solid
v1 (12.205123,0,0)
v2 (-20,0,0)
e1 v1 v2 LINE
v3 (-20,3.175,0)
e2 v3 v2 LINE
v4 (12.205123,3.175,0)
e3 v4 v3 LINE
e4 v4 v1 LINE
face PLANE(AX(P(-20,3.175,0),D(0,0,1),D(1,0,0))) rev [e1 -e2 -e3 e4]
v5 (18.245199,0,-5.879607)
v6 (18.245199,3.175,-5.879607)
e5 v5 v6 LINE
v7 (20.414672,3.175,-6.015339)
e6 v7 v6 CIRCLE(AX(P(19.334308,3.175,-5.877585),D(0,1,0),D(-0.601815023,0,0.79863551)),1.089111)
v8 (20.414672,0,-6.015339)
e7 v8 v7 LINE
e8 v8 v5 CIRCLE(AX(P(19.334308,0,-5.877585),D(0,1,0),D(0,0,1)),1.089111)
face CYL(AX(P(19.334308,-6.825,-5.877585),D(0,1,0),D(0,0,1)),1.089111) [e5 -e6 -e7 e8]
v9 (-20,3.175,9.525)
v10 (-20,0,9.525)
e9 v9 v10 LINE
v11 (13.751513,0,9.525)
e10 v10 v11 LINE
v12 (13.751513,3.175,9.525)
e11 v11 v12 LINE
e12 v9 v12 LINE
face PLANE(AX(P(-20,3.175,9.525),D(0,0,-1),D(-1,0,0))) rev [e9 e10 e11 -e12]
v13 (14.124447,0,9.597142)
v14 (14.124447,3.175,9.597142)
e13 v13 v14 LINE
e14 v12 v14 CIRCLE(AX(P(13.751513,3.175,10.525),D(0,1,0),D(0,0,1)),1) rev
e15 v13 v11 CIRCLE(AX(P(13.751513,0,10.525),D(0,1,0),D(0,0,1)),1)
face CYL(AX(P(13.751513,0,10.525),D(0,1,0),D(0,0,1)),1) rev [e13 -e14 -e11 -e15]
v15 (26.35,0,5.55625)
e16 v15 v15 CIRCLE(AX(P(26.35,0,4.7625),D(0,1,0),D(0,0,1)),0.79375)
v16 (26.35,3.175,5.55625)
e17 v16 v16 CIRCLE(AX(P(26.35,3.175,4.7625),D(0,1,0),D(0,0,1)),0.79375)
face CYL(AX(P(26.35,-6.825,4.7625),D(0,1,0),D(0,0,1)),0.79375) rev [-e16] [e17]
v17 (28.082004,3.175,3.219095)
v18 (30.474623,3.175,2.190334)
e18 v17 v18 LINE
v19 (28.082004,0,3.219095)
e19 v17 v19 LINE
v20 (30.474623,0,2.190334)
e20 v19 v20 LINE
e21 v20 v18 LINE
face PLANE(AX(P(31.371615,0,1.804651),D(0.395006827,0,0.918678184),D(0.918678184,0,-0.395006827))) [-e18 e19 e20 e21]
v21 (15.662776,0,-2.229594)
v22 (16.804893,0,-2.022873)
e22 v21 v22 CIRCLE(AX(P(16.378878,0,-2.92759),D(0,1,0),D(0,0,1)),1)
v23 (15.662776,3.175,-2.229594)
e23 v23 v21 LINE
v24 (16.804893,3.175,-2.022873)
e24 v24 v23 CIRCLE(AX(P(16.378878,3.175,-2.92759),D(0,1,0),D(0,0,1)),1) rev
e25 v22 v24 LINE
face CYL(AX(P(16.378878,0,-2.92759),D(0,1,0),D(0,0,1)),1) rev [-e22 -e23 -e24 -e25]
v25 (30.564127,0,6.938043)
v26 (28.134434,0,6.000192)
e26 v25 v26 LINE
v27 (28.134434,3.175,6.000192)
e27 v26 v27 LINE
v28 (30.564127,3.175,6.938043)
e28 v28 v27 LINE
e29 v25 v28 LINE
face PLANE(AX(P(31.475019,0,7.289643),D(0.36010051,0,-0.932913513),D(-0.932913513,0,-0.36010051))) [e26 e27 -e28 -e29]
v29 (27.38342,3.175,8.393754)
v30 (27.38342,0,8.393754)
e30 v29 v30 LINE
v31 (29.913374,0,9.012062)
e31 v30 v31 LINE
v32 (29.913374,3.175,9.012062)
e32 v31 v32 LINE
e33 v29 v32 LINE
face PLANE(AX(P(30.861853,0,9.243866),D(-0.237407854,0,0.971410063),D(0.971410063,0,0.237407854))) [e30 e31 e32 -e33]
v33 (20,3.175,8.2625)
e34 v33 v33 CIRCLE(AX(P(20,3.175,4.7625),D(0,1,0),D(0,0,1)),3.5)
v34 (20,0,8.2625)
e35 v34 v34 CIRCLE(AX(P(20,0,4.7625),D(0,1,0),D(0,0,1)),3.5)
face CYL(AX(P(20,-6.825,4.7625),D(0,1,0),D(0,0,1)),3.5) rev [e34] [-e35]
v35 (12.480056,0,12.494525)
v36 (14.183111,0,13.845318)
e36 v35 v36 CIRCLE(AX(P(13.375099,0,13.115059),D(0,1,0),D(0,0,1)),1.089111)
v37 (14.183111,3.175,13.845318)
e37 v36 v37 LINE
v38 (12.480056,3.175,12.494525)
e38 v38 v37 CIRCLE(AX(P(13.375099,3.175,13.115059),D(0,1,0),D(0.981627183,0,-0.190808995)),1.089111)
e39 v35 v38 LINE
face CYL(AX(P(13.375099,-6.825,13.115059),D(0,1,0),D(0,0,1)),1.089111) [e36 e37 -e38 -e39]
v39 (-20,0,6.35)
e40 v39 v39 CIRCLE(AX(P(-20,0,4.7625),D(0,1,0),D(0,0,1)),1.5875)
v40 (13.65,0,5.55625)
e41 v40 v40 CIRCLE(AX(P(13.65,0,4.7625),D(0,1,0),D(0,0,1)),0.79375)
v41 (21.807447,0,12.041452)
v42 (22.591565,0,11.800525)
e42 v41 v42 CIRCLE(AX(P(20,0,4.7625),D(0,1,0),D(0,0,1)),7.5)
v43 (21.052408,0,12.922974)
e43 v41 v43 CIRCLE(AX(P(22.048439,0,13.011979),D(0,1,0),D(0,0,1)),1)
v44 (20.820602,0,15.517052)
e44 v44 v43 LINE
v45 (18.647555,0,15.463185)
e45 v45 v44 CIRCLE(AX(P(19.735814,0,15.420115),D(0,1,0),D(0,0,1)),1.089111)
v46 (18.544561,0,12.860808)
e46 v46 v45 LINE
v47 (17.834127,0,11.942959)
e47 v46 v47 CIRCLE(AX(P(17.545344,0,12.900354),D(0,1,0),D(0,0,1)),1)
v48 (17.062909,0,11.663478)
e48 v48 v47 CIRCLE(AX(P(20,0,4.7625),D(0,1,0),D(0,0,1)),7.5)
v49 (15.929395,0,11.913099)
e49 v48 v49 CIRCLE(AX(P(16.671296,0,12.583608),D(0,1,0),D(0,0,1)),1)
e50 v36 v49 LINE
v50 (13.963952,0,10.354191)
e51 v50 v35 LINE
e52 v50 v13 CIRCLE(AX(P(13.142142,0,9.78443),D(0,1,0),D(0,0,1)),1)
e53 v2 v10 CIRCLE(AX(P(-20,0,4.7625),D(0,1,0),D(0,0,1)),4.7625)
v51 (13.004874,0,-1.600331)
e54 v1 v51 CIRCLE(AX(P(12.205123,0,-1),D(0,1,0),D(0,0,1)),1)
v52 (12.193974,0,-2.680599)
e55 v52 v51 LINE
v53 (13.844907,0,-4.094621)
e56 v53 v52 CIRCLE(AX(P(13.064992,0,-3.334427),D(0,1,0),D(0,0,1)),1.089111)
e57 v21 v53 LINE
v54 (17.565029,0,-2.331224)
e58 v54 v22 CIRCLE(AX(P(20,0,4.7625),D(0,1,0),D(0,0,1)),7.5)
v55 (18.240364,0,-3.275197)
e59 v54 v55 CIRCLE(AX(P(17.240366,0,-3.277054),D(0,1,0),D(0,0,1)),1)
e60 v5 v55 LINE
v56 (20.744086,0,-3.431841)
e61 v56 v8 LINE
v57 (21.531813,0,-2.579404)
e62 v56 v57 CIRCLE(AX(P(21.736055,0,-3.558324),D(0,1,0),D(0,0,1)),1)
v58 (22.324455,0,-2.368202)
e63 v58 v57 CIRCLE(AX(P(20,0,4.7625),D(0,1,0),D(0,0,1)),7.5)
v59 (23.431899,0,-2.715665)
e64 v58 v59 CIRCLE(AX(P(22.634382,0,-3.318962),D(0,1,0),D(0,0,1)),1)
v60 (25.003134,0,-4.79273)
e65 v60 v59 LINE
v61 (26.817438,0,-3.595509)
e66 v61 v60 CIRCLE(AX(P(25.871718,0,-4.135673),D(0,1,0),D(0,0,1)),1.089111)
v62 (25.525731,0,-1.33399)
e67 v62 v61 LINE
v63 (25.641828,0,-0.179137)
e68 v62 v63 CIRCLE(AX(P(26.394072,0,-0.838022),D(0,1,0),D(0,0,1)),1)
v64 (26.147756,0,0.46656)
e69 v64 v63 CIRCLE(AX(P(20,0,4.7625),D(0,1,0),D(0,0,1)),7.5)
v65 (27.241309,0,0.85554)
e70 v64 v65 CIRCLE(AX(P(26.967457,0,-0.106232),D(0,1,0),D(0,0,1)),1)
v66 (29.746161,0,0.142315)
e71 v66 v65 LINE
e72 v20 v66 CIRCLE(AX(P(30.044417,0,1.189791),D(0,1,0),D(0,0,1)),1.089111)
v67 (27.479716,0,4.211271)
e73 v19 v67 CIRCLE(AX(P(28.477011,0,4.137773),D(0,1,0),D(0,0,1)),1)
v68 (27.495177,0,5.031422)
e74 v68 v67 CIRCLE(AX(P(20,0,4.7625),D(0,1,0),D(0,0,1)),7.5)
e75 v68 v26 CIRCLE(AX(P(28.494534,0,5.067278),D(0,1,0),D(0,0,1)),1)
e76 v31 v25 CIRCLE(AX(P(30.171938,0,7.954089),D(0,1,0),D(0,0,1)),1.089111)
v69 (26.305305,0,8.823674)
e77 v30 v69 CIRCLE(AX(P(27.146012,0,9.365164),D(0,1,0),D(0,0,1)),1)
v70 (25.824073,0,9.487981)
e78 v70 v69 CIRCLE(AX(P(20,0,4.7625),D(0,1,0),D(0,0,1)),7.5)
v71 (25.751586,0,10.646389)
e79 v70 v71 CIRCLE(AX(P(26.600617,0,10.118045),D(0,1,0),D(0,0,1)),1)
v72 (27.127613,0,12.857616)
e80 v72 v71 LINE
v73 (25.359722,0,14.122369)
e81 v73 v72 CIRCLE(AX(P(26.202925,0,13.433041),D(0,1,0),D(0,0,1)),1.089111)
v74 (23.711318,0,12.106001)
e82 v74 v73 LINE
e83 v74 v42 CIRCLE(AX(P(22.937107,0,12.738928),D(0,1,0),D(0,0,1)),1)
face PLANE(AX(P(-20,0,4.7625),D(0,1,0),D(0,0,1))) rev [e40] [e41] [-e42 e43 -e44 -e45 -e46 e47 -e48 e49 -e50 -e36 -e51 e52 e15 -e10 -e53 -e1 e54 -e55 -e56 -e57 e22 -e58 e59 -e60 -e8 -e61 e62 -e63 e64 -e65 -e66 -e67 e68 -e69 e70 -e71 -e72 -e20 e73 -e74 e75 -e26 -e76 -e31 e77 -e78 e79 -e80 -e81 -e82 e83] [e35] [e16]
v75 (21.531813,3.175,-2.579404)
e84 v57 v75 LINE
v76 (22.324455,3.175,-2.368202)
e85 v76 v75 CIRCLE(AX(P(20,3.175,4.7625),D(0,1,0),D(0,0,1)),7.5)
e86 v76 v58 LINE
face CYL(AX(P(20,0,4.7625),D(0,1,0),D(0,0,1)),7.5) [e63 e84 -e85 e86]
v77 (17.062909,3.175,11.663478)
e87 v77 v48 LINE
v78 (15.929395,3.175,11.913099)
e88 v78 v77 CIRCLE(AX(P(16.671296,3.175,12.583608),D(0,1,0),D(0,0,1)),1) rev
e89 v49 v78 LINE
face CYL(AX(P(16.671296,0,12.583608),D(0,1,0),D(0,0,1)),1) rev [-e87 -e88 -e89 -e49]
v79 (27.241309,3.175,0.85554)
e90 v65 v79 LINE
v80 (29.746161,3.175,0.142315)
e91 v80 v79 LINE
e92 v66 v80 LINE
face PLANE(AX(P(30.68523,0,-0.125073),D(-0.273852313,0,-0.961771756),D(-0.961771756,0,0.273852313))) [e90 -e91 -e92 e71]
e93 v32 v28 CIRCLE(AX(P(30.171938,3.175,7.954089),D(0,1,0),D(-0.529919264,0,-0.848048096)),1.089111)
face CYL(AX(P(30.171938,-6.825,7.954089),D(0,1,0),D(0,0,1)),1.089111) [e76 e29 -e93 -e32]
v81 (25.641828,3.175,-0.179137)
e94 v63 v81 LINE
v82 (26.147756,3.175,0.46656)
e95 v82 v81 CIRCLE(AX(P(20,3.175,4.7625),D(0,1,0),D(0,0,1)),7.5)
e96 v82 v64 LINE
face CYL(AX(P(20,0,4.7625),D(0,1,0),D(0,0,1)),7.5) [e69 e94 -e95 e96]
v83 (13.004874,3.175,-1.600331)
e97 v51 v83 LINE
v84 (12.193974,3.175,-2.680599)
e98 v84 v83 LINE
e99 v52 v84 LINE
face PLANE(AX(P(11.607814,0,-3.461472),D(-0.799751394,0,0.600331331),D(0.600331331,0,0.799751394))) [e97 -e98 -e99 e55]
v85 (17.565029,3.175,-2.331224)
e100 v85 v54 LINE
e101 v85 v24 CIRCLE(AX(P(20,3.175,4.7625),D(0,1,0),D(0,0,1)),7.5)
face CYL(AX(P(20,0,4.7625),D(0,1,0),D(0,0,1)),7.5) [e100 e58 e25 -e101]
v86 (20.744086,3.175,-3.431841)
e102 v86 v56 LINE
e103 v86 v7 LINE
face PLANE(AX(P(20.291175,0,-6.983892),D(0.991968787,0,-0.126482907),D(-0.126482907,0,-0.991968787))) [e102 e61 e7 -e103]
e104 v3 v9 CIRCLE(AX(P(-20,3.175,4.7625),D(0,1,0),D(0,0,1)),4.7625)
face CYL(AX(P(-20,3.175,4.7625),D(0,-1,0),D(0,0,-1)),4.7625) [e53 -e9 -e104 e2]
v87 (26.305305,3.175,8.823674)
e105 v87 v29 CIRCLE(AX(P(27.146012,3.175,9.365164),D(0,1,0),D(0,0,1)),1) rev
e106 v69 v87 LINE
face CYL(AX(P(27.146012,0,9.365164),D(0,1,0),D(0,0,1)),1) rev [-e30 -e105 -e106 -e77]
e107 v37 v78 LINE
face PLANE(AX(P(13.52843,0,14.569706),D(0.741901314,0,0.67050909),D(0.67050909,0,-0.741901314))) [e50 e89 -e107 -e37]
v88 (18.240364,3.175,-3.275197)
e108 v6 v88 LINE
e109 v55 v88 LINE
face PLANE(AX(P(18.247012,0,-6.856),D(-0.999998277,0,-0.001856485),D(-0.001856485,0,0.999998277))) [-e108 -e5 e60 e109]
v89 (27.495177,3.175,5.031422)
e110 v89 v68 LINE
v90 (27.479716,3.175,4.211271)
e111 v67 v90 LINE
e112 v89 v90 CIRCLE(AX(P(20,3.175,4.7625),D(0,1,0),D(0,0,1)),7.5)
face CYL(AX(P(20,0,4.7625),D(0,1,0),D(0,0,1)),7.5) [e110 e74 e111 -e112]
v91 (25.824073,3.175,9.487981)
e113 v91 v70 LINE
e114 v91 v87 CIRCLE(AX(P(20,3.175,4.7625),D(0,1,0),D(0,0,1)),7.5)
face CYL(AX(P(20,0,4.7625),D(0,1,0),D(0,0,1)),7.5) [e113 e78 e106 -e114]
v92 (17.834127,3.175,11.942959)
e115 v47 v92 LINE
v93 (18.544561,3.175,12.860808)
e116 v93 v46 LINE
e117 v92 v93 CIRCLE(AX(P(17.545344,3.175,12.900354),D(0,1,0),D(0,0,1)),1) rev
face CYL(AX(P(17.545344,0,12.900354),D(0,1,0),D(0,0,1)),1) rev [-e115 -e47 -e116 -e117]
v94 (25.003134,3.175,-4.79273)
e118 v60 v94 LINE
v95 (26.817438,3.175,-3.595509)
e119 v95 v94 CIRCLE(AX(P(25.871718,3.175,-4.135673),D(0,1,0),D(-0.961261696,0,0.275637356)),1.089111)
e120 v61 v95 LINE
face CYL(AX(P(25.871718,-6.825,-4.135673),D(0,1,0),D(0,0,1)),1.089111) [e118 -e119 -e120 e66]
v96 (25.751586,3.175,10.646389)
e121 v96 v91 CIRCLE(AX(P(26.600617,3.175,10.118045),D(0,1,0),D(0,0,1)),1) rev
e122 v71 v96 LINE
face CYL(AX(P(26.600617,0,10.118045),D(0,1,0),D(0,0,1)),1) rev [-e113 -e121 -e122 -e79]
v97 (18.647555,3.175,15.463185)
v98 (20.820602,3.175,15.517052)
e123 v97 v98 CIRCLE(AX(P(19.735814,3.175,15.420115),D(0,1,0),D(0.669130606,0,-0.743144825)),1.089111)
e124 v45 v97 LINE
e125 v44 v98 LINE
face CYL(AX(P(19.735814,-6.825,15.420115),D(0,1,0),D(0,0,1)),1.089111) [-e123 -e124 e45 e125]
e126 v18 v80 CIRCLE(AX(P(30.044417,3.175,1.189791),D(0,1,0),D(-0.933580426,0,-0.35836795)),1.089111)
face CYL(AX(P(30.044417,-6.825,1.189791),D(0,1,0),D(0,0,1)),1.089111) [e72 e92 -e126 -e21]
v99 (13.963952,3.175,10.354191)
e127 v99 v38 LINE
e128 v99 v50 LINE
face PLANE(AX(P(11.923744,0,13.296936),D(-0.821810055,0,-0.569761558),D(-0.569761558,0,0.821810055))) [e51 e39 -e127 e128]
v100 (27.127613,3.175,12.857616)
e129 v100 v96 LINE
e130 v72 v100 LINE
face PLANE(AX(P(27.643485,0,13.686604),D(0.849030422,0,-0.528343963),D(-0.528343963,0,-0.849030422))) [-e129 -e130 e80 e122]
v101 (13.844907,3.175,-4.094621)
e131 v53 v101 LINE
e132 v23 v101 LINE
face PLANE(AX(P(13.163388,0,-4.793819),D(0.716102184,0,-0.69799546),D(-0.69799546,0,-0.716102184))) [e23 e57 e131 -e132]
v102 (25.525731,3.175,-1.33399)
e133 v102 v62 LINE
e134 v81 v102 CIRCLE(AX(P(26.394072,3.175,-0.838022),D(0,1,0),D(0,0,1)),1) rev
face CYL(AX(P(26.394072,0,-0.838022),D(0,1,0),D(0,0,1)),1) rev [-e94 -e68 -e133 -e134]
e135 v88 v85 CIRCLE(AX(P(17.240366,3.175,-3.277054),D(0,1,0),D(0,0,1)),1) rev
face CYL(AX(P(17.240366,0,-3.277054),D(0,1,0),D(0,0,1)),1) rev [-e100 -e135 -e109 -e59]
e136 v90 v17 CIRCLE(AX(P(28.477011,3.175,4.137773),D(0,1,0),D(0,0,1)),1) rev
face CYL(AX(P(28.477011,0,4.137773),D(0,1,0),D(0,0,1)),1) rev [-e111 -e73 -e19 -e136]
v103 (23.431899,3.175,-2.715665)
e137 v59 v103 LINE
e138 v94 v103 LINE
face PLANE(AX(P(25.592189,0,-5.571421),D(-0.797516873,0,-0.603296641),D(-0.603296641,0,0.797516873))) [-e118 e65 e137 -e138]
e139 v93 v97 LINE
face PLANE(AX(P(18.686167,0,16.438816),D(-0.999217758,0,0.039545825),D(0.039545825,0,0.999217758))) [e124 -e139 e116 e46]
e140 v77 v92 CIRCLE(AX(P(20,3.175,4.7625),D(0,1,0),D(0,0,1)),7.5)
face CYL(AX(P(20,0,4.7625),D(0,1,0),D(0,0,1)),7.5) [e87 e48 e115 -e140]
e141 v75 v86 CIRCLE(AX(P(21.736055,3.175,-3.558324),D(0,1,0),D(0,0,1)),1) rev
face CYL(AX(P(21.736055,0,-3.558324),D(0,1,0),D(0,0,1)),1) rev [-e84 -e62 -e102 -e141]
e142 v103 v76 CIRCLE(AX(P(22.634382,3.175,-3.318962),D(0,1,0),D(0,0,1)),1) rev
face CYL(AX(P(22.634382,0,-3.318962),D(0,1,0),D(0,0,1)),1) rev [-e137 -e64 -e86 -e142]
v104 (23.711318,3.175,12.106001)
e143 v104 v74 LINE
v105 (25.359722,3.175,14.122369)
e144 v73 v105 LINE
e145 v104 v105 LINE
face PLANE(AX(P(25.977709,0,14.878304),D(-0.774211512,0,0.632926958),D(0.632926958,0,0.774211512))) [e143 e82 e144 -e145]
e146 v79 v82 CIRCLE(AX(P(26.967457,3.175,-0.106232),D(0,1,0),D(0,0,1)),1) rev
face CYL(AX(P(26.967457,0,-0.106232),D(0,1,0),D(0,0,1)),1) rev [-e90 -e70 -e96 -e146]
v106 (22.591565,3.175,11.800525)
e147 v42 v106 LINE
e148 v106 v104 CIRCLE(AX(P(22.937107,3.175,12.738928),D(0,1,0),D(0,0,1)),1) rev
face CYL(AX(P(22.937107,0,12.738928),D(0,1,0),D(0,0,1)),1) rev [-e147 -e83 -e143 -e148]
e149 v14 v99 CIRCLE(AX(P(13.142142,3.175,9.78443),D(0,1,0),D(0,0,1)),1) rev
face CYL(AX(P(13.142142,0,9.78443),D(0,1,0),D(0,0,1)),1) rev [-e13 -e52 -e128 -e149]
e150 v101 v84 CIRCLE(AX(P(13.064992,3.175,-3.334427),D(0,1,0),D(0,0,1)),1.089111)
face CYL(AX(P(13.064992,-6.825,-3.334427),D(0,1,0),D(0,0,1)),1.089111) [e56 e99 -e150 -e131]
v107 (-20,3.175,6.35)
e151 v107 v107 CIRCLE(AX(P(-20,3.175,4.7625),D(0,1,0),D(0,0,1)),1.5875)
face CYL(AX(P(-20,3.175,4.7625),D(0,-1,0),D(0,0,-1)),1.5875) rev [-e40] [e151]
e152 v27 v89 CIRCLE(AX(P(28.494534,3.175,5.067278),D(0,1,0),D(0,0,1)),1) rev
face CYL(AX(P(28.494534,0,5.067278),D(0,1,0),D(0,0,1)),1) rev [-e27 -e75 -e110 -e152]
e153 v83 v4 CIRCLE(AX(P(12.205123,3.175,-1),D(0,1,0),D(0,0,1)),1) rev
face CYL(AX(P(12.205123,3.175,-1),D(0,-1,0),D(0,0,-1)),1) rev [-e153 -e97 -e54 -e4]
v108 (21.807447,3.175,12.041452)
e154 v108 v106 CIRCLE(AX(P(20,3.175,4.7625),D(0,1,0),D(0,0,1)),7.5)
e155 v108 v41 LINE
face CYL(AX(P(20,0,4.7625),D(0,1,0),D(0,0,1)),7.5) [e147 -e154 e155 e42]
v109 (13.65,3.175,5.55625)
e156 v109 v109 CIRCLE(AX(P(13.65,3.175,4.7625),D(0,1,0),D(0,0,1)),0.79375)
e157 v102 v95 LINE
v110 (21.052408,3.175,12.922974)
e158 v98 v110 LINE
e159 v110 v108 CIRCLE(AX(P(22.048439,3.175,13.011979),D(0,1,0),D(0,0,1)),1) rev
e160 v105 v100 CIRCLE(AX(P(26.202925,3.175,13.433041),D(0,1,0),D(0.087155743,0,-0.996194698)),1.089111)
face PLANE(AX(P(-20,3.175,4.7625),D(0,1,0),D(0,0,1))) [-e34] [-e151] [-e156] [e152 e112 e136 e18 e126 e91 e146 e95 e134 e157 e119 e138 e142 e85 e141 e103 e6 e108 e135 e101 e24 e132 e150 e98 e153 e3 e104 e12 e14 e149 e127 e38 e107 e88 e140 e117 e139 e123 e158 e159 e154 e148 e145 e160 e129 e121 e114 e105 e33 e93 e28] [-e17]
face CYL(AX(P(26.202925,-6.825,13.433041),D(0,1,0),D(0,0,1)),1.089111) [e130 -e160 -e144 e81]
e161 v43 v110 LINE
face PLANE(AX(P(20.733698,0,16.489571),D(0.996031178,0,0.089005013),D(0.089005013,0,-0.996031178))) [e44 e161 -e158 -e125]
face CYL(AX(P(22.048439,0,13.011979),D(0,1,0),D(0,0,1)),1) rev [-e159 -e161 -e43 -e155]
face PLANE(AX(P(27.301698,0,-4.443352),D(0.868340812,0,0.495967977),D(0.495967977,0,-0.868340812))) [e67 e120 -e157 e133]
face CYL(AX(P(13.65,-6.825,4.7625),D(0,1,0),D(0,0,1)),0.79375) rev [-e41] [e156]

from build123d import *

# Parameters (mm, degrees)
CROQUIS1_R              = 1.5875
SALIENTE_EXTRUIR1_DEPTH = 3.175
SALIENTE_EXTRUIR2_START = -3.175
CROQUIS2_R              = 7.5
CROQUIS2_R_2            = 1.5875
SALIENTE_EXTRUIR2_DEPTH = 3.175
CROQUIS7_R              = 3.5
CROQUIS7_R_2            = 0.79375
CORTAR_EXTRUIR3_DEPTH   = 10
SALIENTE_EXTRUIR3_START = -3.175
SALIENTE_EXTRUIR3_DEPTH = 3.175
CORTAR_EXTRUIR4_START   = -10
CORTAR_EXTRUIR4_DEPTH   = 10
MATRIZC1_COUNT          = 8
MATRIZC1_ANGLE          = 259
REDONDEO1_R             = 1


with BuildPart() as part:
    # Croquis1 → Saliente-Extruir1 (new body)
    with BuildSketch(Plane(origin=(0, 0, 0), x_dir=(1, 0, 0), z_dir=(0, 1, 0))):
        with BuildLine():
            Line((-20, 0), (20, 0))
            ThreePointArc((20, 0), (24.7625, -4.7625), (20, -9.525))
            Line((20, -9.525), (-20, -9.525))
            ThreePointArc((-20, -9.525), (-24.7625, -4.7625), (-20, 0))
        make_face()
        with Locations(Location((-20, -4.7625, 0), (0, 0, 270))):
            Circle(CROQUIS1_R, mode=Mode.SUBTRACT)
        with Locations(Location((20, -4.7625, 0), (0, 0, 270))):
            Circle(CROQUIS1_R, mode=Mode.SUBTRACT)
    extrude(amount=SALIENTE_EXTRUIR1_DEPTH)

    # Croquis2 → Saliente-Extruir2 (add)
    with BuildSketch(Plane(origin=(0, 3.175, 0), x_dir=(1, 0, 0), z_dir=(0, 1, 0)).offset(SALIENTE_EXTRUIR2_START)):
        with Locations((20, -4.7625)):
            Circle(CROQUIS2_R)
        with Locations(Location((20, -4.7625, 0), (0, 0, 270))):
            Circle(CROQUIS2_R_2, mode=Mode.SUBTRACT)
    extrude(amount=SALIENTE_EXTRUIR2_DEPTH)

    # Croquis7 → Cortar-Extruir3 (cut)
    with BuildSketch(Plane(origin=(0, 3.175, 0), x_dir=(1, 0, 0), z_dir=(0, 1, 0))):
        with Locations(Location((20, -4.7625, 0), (0, 0, 270))):
            Circle(CROQUIS7_R)
        with Locations(Location((13.65, -4.7625, 0), (0, 0, 270))):
            Circle(CROQUIS7_R_2)
        with Locations(Location((26.35, -4.7625, 0), (0, 0, 270))):
            Circle(CROQUIS7_R_2)
    extrude(amount=-CORTAR_EXTRUIR3_DEPTH, mode=Mode.SUBTRACT)

    # Croquis8 → Saliente-Extruir3 (add)
    with BuildSketch(Plane(origin=(0, 3.175, 0), x_dir=(1, 0, 0), z_dir=(0, 1, 0)).offset(SALIENTE_EXTRUIR3_START)):
        with BuildLine():
            Line((11.607813982, 3.461471902), (14.206158981, 0))
            ThreePointArc((14.206158981, 0), (15.121179891, 0.933736858), (16.184441281, 1.694396442))
            Line((16.184441281, 1.694396442), (13.163387879, 4.793819098))
            ThreePointArc((13.163387879, 4.793819098), (12.356515163, 4.161604411), (11.607813982, 3.461471902))
        make_face()
    saliente_extruir3 = extrude(amount=SALIENTE_EXTRUIR3_DEPTH)

    # Croquis9 → Cortar-Extruir4 (cut)
    with BuildSketch(Plane(origin=(0, 3.175, 0), x_dir=(1, 0, 0), z_dir=(0, 1, 0)).offset(CORTAR_EXTRUIR4_START)):
        with BuildLine():
            ThreePointArc((12.35651523, 4.161604469), (11.974526132, 3.819706546), (11.607813982, 3.461471902))
            Line((11.607813982, 3.461471902), (12.19397403, 2.680599255))
            ThreePointArc((12.19397403, 2.680599255), (11.982381708, 3.453243741), (12.35651523, 4.161604469))
        make_face()
        with BuildLine():
            ThreePointArc((13.163387879, 4.793819098), (12.753054069, 4.486514795), (12.35651523, 4.161604469))
            ThreePointArc((12.35651523, 4.161604469), (13.113956627, 4.422436237), (13.844906618, 4.094621057))
            Line((13.844906618, 4.094621057), (13.163387879, 4.793819098))
        make_face()
    cortar_extruir4 = extrude(amount=CORTAR_EXTRUIR4_DEPTH, mode=Mode.SUBTRACT)

    # MatrizC1: Saliente-Extruir3, Cortar-Extruir4 ×8 about axis
    matrizc1_axis = Axis((20, 0, 4.7625), (0, -1, 0))
    add([saliente_extruir3.rotate(matrizc1_axis, i * MATRIZC1_ANGLE / (MATRIZC1_COUNT - 1)) for i in range(1, MATRIZC1_COUNT)])
    add([cortar_extruir4.rotate(matrizc1_axis, i * MATRIZC1_ANGLE / (MATRIZC1_COUNT - 1)) for i in range(1, MATRIZC1_COUNT)], mode=Mode.SUBTRACT)

    # Redondeo1
    # the kernel refuses this fillet: 1 mm, written as the material it adds along each edge
    with BuildSketch(Plane(origin=(25.155056708, 0, -0.685012307), x_dir=(0.6933697506528057, 0, 0.7205819792915072), z_dir=(0, 1, 0)), Plane(origin=(27.395406089, 0, 3.514313802), x_dir=(0.12009264391370789, 0, 0.9927626891044079), z_dir=(0, 1, 0)), Plane(origin=(26.657411119, 0, 8.216320666), x_dir=(-0.501549250802915, 0, 0.8651290938461349), z_dir=(0, 1, 0)), Plane(origin=(23.238283761, 0, 11.527373856), x_dir=(-0.9212027273713431, 0, 0.389082941136718), z_dir=(0, 1, 0)), Plane(origin=(18.515005687, 0, 12.114016299), x_dir=(-0.9698611692594302, 0, -0.243658187555294), z_dir=(0, 1, 0)), Plane(origin=(14.389777858, 0, 9.739990082), x_dir=(-0.6279284118017822, 0, -0.7782711029275668), z_dir=(0, 1, 0)), Plane(origin=(16.184441281, 0, -1.694396442), x_dir=(0.8837864601497757, 0, -0.4678904710035554), z_dir=(0, 1, 0)), Plane(origin=(20.838616598, 0, -2.690467342), x_dir=(0.9874067650142349, 0, 0.15820202402031353), z_dir=(0, 1, 0))) as redondeo1_piece_1:
        with BuildLine():
            CenterArc((0.748840141, 0.998904162), REDONDEO1_R, 196.368950511, 70.948483307)
            Line((-0.210626698, 0.717082614), (0, 0))
            ThreePointArc((0, 0), (0.351018816, 0.008218784), (0.702037632, 0))
        make_face()
    extrude(amount=3.175)
    with BuildSketch(Plane(origin=(22.981009808, 0, -2.119620351), x_dir=(0.6032966406304949, 0, -0.7975168734289948), z_dir=(0, 1, 0)), Plane(origin=(26.522503707, 0, 1.06021079), x_dir=(0.9617717559465732, 0, -0.2738523132336944), z_dir=(0, 1, 0)), Plane(origin=(27.437196341, 0, 5.731061088), x_dir=(0.9329135130884484, 0, 0.36010050971495355), z_dir=(0, 1, 0)), Plane(origin=(25.35671448, 0, 10.011843767), x_dir=(0.5283439627642348, 0, 0.8490304217226758), z_dir=(0, 1, 0)), Plane(origin=(21.11892846, 0, 12.178563585), x_dir=(-0.0890050127232042, 0, 0.9960311780813601), z_dir=(0, 1, 0)), Plane(origin=(16.430517523, 0, 11.358619681), x_dir=(-0.6705090902301596, 0, 0.7419013141373477), z_dir=(0, 1, 0)), Plane(origin=(18.238976871, 0, -2.527822183), x_dir=(0.0018564846529317855, 0, -0.9999982767308818), z_dir=(0, 1, 0))) as redondeo1_piece_2:
        with BuildLine():
            CenterArc((0.747376131, 1), REDONDEO1_R, 199.051516693, 70.948483307)
            ThreePointArc((-0.197849332, 0.673581828), (-0.091039016, 0.339107144), (0, 0))
            Line((0, 0), (0.747376131, 0))
        make_face()
    extrude(amount=3.175)
    with BuildSketch(Plane(origin=(14.206158981, 3.175, 0), x_dir=(-1, 0, 0), z_dir=(0, -1, 0))) as redondeo1_piece_3:
        with BuildLine():
            CenterArc((REDONDEO1_R * 2.00103600097, REDONDEO1_R), REDONDEO1_R, 143.106368796, 126.893631204)
            Line((REDONDEO1_R * 1.20128460683, REDONDEO1_R * 1.6003313315), (0, 0))
            Line((0, 0), (REDONDEO1_R * 2.00103600097, 0))
        make_face()
    extrude(amount=3.175)
    with BuildSketch(Plane(origin=(14.206158981, 3.175, 9.525), x_dir=(-1, 0, 0), z_dir=(0, -1, 0))) as redondeo1_piece_4:
        with BuildLine():
            CenterArc((0.454646298, -1), REDONDEO1_R, 90, 47.317031956)
            ThreePointArc((-0.280469857, -0.322058824), (-0.137942125, -0.163026135), (0, 0))
            Line((0, 0), (0.454646298, 0))
        make_face()
    extrude(amount=3.175)


solid = part.part
